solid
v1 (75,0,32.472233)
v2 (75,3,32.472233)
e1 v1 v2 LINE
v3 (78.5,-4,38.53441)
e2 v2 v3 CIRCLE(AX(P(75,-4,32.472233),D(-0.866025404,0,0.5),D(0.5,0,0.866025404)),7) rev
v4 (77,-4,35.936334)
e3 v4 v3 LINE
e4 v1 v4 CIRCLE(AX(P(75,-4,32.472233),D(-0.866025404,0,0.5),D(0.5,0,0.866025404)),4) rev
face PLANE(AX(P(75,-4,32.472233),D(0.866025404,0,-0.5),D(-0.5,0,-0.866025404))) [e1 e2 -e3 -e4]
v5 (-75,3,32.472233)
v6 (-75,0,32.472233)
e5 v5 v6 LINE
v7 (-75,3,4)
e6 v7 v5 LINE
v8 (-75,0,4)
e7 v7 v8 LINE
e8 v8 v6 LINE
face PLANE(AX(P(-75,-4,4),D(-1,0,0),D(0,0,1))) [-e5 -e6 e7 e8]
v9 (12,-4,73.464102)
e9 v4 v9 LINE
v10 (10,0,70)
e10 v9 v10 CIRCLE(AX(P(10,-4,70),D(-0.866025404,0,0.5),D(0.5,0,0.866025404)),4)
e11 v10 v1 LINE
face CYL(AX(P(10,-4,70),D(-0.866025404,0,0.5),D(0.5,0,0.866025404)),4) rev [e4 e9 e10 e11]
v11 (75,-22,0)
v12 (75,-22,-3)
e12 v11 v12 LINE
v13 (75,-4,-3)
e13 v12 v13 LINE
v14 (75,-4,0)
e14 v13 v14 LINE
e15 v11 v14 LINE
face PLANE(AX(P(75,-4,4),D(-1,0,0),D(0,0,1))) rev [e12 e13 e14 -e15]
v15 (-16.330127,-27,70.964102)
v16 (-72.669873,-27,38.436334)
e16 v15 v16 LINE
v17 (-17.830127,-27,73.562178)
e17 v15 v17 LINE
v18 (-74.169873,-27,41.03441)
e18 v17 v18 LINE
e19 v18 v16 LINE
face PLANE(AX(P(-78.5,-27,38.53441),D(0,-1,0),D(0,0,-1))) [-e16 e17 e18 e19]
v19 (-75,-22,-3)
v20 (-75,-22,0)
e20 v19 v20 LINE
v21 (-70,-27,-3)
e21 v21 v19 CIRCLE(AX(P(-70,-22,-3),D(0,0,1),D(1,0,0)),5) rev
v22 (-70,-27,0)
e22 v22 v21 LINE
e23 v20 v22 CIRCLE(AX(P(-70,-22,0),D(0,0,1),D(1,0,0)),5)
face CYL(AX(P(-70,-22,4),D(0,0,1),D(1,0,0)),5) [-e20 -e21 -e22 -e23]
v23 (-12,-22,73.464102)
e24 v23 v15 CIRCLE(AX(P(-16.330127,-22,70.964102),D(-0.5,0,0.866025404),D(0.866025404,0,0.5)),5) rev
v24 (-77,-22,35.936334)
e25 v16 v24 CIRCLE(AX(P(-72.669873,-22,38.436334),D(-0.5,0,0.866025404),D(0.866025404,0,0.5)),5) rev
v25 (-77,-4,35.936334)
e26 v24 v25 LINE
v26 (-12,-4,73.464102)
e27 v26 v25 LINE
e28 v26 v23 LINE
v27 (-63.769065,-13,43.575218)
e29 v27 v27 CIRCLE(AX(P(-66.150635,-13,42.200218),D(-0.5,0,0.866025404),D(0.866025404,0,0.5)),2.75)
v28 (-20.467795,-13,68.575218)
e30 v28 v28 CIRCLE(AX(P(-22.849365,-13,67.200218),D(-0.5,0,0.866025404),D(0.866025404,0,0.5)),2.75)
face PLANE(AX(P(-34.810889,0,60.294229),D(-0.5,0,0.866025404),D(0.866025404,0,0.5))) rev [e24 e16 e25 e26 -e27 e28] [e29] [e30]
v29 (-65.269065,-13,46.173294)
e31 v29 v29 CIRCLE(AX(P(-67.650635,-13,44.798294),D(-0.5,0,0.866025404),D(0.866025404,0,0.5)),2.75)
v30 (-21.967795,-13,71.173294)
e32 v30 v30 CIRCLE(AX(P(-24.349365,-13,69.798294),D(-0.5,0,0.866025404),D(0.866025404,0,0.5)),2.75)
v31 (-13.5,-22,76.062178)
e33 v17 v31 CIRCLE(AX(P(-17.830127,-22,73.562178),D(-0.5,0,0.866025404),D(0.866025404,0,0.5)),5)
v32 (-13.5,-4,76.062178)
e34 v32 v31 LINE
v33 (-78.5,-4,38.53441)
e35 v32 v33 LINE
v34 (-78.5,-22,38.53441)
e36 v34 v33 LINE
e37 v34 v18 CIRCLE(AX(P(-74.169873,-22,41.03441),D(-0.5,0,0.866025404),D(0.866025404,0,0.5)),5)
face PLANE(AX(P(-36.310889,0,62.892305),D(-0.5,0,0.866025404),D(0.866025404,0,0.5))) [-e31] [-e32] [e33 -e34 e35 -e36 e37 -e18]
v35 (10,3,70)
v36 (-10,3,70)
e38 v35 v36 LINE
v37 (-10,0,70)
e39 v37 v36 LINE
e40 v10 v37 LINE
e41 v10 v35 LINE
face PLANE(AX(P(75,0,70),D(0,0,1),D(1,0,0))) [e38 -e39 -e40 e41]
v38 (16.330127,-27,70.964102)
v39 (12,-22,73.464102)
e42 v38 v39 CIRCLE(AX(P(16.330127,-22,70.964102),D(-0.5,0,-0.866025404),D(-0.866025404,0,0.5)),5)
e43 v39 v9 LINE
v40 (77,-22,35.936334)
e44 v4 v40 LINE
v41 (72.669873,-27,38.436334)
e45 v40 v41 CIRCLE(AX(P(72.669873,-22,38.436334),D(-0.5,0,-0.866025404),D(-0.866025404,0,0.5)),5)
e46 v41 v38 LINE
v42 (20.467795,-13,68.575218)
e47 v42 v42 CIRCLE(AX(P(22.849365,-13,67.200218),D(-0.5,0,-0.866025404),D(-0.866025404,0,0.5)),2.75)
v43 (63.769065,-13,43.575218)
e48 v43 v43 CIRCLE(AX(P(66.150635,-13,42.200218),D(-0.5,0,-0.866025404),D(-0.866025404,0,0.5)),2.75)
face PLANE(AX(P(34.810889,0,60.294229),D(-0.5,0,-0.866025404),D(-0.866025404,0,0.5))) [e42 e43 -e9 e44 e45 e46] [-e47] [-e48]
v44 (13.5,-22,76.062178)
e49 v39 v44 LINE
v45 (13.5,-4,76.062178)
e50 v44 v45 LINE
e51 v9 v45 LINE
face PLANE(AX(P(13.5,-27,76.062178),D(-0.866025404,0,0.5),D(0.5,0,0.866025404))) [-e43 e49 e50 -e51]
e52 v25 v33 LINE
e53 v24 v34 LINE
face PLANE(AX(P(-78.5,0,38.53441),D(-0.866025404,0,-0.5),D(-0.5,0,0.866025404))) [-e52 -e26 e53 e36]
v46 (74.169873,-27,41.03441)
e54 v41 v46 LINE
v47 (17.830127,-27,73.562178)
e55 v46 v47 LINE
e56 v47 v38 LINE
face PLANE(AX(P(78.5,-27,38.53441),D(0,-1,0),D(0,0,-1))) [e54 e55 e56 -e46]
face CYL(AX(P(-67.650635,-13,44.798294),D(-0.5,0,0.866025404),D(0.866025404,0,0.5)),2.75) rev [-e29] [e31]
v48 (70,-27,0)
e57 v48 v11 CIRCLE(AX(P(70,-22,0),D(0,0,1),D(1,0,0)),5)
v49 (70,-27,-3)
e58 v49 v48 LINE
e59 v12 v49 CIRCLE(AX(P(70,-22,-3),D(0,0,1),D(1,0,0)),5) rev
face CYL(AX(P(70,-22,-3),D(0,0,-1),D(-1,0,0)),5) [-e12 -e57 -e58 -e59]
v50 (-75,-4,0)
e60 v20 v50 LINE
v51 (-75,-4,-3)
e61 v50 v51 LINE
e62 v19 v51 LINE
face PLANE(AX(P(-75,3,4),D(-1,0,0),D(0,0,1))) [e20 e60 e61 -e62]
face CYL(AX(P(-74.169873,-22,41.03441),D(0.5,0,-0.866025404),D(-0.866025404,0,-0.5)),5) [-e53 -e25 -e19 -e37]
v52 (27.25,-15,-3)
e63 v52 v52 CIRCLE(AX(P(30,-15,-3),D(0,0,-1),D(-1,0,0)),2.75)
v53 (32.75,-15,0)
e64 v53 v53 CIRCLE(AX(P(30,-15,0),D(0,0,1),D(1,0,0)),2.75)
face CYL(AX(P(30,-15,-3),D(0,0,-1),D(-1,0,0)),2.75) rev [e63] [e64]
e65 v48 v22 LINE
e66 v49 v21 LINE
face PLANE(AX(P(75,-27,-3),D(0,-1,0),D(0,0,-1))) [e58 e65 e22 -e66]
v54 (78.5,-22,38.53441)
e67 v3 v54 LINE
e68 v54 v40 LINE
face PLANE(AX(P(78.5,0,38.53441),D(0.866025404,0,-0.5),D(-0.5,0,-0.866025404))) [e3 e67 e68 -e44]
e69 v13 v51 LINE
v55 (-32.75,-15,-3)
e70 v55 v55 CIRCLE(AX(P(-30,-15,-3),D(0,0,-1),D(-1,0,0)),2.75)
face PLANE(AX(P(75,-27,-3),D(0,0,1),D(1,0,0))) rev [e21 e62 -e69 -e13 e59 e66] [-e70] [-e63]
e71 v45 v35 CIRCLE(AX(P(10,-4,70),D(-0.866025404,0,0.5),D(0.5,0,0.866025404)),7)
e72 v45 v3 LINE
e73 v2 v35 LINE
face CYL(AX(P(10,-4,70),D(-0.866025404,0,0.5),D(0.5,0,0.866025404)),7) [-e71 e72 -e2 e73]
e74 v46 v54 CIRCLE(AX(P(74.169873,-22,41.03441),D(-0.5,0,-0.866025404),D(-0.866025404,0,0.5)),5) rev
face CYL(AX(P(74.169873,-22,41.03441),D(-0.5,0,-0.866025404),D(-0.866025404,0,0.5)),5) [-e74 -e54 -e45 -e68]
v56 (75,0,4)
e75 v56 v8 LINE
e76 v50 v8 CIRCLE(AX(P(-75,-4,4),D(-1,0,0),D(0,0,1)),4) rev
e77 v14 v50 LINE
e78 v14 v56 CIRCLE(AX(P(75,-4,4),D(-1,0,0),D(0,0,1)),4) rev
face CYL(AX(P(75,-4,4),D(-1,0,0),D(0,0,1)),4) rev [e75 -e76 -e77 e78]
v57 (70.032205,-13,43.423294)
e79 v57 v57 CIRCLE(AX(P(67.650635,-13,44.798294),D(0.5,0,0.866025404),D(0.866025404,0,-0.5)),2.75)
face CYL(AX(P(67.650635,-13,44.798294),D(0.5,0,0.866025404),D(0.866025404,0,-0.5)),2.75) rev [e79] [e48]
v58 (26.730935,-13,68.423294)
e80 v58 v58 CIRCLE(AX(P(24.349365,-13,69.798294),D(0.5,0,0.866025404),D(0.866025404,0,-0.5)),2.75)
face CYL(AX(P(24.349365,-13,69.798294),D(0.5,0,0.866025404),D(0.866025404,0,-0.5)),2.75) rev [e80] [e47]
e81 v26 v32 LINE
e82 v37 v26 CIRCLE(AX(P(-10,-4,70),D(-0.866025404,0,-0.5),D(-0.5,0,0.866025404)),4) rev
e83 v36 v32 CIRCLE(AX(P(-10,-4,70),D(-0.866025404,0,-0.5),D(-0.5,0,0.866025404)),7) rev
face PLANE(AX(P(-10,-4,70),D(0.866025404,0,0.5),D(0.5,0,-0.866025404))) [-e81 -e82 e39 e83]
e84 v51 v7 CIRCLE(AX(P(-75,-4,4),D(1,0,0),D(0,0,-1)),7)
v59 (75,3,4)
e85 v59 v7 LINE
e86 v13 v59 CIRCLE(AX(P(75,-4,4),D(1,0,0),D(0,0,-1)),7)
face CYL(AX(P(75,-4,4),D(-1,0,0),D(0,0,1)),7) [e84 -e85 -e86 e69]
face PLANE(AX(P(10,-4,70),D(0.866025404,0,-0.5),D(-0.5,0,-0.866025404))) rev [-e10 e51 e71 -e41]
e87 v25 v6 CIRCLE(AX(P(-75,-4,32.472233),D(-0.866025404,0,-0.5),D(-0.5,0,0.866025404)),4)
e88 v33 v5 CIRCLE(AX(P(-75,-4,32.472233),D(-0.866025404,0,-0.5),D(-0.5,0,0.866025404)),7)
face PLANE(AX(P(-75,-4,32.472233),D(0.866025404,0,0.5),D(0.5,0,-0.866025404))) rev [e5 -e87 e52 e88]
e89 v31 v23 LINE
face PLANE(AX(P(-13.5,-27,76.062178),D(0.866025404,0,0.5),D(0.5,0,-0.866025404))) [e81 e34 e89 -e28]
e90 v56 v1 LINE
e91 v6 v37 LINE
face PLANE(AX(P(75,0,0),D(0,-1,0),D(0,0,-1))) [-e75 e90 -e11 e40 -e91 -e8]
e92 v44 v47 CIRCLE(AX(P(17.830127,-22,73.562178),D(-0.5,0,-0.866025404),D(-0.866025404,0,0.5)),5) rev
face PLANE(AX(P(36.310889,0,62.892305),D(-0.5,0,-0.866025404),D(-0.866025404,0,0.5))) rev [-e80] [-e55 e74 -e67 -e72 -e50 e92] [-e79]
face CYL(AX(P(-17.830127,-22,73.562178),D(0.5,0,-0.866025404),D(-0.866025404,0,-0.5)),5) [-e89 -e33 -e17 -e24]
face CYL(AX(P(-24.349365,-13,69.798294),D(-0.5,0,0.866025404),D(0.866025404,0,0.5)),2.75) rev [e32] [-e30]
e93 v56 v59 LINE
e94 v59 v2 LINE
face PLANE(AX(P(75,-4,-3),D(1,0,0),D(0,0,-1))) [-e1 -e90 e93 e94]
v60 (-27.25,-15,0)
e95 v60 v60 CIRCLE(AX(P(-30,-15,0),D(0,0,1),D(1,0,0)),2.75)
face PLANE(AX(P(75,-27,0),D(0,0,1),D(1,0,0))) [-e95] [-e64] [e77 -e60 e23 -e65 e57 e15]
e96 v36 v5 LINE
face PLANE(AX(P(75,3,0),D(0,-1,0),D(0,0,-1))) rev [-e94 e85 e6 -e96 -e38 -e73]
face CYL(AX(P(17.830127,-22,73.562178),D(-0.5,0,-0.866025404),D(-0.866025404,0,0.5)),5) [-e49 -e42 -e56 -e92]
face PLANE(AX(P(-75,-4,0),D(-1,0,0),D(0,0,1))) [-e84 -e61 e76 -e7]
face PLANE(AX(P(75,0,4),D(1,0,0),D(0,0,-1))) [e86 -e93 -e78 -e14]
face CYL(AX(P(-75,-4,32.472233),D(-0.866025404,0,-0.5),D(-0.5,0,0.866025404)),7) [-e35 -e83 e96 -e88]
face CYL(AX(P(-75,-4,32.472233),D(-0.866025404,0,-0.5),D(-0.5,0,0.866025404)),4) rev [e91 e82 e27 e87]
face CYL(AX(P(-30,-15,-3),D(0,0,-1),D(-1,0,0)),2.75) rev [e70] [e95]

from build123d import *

# Parameters (mm, degrees)
ODGI_CIE_BAZOWE1_DEPTH        = 75
WYTNIJ_WYCI_GNI_CIE1_DEPTH    = 10
ODGI_CIE_KRAW_DZI1_DEPTH      = 75.055534995
ODGI_CIE_KRAW_DZI1_BEND_DEPTH = 75.055534995
OTW_R_POD_RUB_M52_D           = 5.5
OTW_R_POD_RUB_M52_DEPTH       = 10
OTW_R_POD_RUB_M52_TIP         = 1.652366702
OTW_R_POD_RUB_M51_AT_2_COUNT  = 2
OTW_R_POD_RUB_M51_AT_2_PITCH  = 50
ZAOKR_GLENIE1_R               = 5


# Sheet-metal steps are written as plain solids
with BuildPart() as part:
    # Szkic1 → Odgięcie bazowe1 (new, symmetric)
    with BuildSketch(Plane(origin=(0, 0, 0), x_dir=(0, 0, -1), z_dir=(1, 0, 0))):
        with BuildLine():
            Line((0, -27), (0, -4))
            ThreePointArc((0, -4), (-1.171572875, -1.171572875), (-4, 0))
            Line((-4, 0), (-70, 0))
            Line((-70, 0), (-70, 3))
            Line((-70, 3), (-4, 3))
            ThreePointArc((-4, 3), (0.949747468, 0.949747468), (3, -4))
            Line((3, -4), (3, -27))
            Line((3, -27), (0, -27))
        make_face()
    extrude(amount=ODGI_CIE_BAZOWE1_DEPTH, both=True)

    # Szkic6 → Wytnij-wyciągnięcie1 (cut)
    with BuildSketch(Plane(origin=(0, 3, 0), x_dir=(1, 0, 0), z_dir=(0, 1, 0))):
        Polygon((-75, -32.472232503), (-10, -70), (-75, -70), align=None)
        Polygon((75, -70), (75, -32.472232503), (10, -70), align=None)
    extrude(amount=-WYTNIJ_WYCI_GNI_CIE1_DEPTH, mode=Mode.SUBTRACT)

    # Odgięcie krawędzi1 section (across the edge) → Odgięcie krawędzi1 (add)
    with BuildSketch(Plane(origin=(-12, 0, 73.464101615), x_dir=(0.4999999999999948, -3.3854238149706416e-15, -0.8660254037844417), z_dir=(-0.8660254037844417, 0, -0.4999999999999948))):
        with BuildLine():
            Line((-3, 4), (-3, 27))
            Line((-3, 27), (0, 27))
            Line((0, 27), (0, 4))
            ThreePointArc((0, 4), (1.171572875, 1.171572875), (4, 0))
            Line((4, 0), (4, -3))
            ThreePointArc((4, -3), (-0.949747468, -0.949747468), (-3, 4))
        make_face()
    extrude(amount=ODGI_CIE_KRAW_DZI1_DEPTH)

    # Odgięcie krawędzi1 section 2 (across the edge) → Odgięcie krawędzi1 bend (add)
    with BuildSketch(Plane(origin=(77, 0, 35.936334118), x_dir=(-0.49999999999999467, -3.3854238149706423e-15, -0.8660254037844417), z_dir=(-0.8660254037844417, 0, 0.49999999999999467))):
        with BuildLine():
            Line((-3, 4), (-3, 27))
            Line((-3, 27), (0, 27))
            Line((0, 27), (0, 4))
            ThreePointArc((0, 4), (1.171572875, 1.171572875), (4, 0))
            Line((4, 0), (4, -3))
            ThreePointArc((4, -3), (-0.949747468, -0.949747468), (-3, 4))
        make_face()
    extrude(amount=ODGI_CIE_KRAW_DZI1_BEND_DEPTH)

    # Otwór pod śrubę M52
    with Locations(Plane(origin=(0, 0, -3), x_dir=(-1, 0, 0), z_dir=(0, 0, -1))):
        with Locations((-30, -15), (30, -15)):
            Hole(OTW_R_POD_RUB_M52_D / 2, depth=OTW_R_POD_RUB_M52_DEPTH)
            with Locations((0, 0, -(OTW_R_POD_RUB_M52_DEPTH + OTW_R_POD_RUB_M52_TIP / 2))):  # 118° drill point
                Cone(0, OTW_R_POD_RUB_M52_D / 2, OTW_R_POD_RUB_M52_TIP, mode=Mode.SUBTRACT)

    # Szkic16 → Otwór pod śrubę M51 (revolve, cut)
    with BuildSketch(Plane(origin=(-67.650635095, -13, 44.798294078), x_dir=(0.8660254037844417, 0, 0.4999999999999949), z_dir=(0, 1, 0))):
        Polygon((0, 0), (0, 11.652366702), (2.75, 10), (2.75, 0), align=None)
    otw_r_pod_rub_m51 = revolve(axis=Axis((-70.825635095, -13, 50.297555392), (0.4999999999999949, -3.3879771740092313e-15, -0.8660254037844417)), mode=Mode.SUBTRACT)

    # Otwór pod śrubę M51 at 2: Otwór pod śrubę M51 ×2
    with Locations(*[Vector(0.8660254037844417, 1.9224128461953825e-15, 0.49999999999999495) * (i * OTW_R_POD_RUB_M51_AT_2_PITCH) for i in range(1, OTW_R_POD_RUB_M51_AT_2_COUNT)]):
        add(otw_r_pod_rub_m51, mode=Mode.SUBTRACT)

    # Lustro1: Otwór pod śrubę M51 across plane
    add(otw_r_pod_rub_m51.mirror(Plane(origin=(0, 0, 0), x_dir=(0, 0, 1), z_dir=(1, 0, 0))), mode=Mode.SUBTRACT)

    # Lustro1 copy 1 sketch → Lustro1 copy 1 (revolve, cut)
    with BuildSketch(Plane(origin=(24.349364905, -13, 69.798294078), x_dir=(-0.8660254037844417, 0, 0.4999999999999949), z_dir=(0, 1, 0))):
        Polygon((0, 0), (0, -11.652366702), (2.75, -10), (2.75, 0), align=None)
    revolve(axis=Axis((27.524364905, -13, 75.297555392), (0.4999999999999949, 3.3879771740092313e-15, 0.8660254037844417)), mode=Mode.SUBTRACT)

    # Zaokrąglenie1
    zaokr_glenie1_edges = [part.edges().sort_by_distance(p)[0] for p in [
        (75, -27, -1.5),
        (-12.75, -27, 74.763139721),
        (-77.75, -27, 37.235372223),
        (-75, -27, -1.5),
        (77.75, -27, 37.235372223),
        (12.75, -27, 74.763139721),
    ]]
    fillet(zaokr_glenie1_edges, radius=ZAOKR_GLENIE1_R)


solid = part.part
